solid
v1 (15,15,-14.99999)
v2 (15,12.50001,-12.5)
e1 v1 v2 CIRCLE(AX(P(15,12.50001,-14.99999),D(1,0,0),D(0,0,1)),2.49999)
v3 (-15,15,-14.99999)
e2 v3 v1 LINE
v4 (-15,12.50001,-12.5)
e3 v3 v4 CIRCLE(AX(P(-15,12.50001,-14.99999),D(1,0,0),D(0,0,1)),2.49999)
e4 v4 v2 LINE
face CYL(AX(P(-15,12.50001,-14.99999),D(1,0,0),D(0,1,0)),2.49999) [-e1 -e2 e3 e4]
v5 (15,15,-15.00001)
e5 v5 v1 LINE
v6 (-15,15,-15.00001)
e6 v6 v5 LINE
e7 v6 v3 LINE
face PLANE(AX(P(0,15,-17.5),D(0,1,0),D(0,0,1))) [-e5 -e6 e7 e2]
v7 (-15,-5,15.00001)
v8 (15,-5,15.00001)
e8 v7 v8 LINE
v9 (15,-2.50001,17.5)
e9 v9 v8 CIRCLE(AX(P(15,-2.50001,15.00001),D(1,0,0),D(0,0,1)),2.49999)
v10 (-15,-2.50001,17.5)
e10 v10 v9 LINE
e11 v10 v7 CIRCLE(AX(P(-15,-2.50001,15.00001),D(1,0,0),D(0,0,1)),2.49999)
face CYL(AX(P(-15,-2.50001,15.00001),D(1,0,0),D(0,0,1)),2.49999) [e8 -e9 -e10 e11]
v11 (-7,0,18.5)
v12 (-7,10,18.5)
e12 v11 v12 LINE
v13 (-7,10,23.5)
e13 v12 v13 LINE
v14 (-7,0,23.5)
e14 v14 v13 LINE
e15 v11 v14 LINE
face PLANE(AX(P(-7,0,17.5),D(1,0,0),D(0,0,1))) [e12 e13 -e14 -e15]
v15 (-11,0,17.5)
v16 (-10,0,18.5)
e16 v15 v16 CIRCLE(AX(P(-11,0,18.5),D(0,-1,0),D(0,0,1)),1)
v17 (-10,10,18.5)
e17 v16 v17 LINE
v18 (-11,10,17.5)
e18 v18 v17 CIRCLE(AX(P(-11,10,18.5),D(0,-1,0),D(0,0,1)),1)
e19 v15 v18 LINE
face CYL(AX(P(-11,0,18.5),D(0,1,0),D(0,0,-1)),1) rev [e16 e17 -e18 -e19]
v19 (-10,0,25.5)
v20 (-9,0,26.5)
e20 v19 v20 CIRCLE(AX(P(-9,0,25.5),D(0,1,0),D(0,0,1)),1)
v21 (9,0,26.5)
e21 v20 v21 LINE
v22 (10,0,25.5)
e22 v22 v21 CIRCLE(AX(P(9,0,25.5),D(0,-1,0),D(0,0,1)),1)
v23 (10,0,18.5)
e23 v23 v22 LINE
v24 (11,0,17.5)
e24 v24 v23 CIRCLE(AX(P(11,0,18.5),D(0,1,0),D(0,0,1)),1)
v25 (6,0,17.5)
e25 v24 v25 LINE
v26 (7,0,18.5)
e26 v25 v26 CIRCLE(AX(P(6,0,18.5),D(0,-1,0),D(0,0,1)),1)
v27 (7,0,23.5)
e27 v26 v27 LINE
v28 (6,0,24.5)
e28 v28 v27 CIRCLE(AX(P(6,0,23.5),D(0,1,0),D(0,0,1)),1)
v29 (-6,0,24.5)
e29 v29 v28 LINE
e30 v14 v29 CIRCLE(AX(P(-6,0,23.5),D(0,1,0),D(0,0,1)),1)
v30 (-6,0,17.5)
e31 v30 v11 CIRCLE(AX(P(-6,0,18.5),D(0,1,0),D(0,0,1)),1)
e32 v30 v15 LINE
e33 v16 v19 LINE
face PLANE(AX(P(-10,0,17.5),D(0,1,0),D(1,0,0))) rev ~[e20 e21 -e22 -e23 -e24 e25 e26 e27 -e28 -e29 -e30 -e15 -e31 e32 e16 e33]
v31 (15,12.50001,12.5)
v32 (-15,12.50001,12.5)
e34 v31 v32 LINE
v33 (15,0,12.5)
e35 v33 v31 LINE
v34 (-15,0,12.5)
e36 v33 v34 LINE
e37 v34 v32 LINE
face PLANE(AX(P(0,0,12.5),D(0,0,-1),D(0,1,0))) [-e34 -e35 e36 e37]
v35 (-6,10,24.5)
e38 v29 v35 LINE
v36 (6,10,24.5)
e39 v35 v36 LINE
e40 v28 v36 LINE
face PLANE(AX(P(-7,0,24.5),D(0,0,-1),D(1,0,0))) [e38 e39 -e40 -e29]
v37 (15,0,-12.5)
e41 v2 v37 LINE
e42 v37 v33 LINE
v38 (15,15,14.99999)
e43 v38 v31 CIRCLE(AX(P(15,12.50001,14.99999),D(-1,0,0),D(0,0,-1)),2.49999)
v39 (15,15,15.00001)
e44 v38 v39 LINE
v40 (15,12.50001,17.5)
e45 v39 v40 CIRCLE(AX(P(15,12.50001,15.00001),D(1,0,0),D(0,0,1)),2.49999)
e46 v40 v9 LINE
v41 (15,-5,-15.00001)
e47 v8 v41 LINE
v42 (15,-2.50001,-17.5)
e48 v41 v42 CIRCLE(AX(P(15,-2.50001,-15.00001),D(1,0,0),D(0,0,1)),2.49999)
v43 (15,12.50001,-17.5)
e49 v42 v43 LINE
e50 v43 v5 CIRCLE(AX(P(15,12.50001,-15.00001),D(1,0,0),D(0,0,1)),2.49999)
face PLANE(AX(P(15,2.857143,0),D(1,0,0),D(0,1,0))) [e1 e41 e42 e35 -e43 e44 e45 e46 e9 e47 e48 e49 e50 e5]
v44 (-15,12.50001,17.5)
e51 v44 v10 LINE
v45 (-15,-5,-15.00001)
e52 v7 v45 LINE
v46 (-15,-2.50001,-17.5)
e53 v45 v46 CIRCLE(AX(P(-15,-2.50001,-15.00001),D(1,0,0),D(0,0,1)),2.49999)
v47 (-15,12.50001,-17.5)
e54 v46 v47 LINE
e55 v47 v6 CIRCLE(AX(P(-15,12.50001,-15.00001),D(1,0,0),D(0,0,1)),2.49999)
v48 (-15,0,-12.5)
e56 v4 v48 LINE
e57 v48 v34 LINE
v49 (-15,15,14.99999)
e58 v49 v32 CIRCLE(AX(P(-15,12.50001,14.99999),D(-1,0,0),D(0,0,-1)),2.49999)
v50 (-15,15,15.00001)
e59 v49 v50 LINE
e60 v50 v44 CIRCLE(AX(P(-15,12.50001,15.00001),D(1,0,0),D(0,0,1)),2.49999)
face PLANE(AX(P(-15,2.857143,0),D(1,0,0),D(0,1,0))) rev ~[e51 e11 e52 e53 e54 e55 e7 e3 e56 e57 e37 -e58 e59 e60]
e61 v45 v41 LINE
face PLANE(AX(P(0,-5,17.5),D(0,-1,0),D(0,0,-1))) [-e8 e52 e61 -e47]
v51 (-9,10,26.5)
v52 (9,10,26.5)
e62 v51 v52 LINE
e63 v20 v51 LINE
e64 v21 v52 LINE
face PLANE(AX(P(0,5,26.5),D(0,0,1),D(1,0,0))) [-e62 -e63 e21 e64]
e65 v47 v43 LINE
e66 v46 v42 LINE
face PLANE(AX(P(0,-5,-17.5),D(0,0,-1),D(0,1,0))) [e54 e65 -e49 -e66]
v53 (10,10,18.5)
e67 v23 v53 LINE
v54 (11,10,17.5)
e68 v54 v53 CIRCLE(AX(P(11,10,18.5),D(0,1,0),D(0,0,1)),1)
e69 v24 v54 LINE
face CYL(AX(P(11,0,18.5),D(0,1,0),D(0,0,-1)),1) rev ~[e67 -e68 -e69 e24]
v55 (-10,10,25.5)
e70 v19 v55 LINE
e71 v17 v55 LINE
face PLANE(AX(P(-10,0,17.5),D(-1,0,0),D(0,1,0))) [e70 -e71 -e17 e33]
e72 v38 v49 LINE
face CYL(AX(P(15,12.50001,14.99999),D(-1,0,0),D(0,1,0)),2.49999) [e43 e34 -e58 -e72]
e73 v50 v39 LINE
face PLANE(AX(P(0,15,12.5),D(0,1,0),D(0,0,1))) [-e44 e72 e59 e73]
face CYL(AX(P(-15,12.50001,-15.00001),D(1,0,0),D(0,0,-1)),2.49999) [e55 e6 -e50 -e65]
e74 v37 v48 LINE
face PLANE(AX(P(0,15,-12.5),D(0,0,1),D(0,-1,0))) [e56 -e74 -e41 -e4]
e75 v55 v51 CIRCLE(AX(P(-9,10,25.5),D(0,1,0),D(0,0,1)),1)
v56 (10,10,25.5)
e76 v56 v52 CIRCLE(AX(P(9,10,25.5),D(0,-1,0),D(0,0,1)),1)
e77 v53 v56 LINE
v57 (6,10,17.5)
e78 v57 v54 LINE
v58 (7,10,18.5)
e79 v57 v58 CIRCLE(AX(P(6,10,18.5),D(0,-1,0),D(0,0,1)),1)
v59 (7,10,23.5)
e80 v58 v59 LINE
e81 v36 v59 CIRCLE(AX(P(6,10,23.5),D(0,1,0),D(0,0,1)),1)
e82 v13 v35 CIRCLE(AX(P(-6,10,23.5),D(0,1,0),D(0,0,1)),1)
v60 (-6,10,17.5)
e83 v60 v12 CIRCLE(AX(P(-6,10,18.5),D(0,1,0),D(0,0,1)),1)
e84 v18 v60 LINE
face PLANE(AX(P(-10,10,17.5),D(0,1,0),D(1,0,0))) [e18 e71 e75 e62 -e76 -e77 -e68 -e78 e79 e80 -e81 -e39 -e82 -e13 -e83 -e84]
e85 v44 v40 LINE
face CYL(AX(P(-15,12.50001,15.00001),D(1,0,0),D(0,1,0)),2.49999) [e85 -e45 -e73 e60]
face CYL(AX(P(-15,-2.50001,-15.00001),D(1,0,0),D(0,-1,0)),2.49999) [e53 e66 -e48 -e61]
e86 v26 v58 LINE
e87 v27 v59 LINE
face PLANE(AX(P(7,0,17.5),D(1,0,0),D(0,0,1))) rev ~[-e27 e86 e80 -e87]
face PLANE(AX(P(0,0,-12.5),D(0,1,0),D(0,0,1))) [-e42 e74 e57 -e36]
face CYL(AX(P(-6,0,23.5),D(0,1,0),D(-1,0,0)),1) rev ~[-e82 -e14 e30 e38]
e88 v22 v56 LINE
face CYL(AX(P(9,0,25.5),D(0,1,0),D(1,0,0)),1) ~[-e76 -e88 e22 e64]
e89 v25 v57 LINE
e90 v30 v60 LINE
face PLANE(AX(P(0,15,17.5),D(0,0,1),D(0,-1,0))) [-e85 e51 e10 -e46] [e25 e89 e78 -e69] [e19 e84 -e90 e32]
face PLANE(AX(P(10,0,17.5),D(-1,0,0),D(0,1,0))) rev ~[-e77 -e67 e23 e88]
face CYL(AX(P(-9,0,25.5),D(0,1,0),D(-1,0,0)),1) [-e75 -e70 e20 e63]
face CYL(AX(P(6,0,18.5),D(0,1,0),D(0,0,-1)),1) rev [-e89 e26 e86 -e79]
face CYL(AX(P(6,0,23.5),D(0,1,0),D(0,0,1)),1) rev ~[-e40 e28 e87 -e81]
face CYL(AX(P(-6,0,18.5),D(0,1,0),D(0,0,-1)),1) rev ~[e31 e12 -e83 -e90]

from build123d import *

# Parameters (mm, degrees)
F1_DEPTH = 15
F2_W     = 20
F2_H     = 10
F3_DEPTH = 9
F4_R     = 2.49999
F5_W     = 14
F5_H     = 7
F6_DEPTH = 10
F7_R     = 1


# Not quite as in the source:
# - a fillet or chamfer is up to 0.001 mm smaller than in the source, because OpenCascade refuses the exact size


with BuildPart() as f1:
    # F0 (on Right) → F1 (new body, symmetric)
    with BuildSketch(Plane.YZ):
        Polygon((15, 12.5), (15, 17.5), (-5, 17.5), (-5, -17.5), (15, -17.5), (15, -12.5), (0, -12.5), (0, 12.5), align=None)
    extrude(amount=F1_DEPTH, both=True)

    # F2 (on face) → F3 (join)
    with BuildSketch(Plane.XY.offset(17.5)):
        with Locations((0, 5)):
            Rectangle(F2_W, F2_H)
    extrude(amount=F3_DEPTH)

    # F4 (radius 2.5 in the source; OpenCascade refuses exactly that, so slightly less here)
    f4_edges = [f1.edges().sort_by_distance(p)[0] for p in [
        (0, 15, 12.5),
        (0, 15, -12.5),
        (0, 15, 17.5),
        (0, 15, -17.5),
        (0, -5, 17.5),
        (0, -5, -17.5),
    ]]
    fillet(f4_edges, radius=F4_R)

    # F5 (on face) → F6 (cut, through all)
    with BuildSketch(Plane.XZ):
        with Locations((0, 21)):
            Rectangle(F5_W, F5_H)
    extrude(amount=-F6_DEPTH, mode=Mode.SUBTRACT)

    # F7
    f7_edges = [f1.edges().sort_by_distance(p)[0] for p in [
        (-7, 5, 17.5),
        (-7, 5, 24.5),
        (7, 5, 17.5),
        (7, 5, 24.5),
        (-10, 5, 17.5),
        (-10, 5, 26.5),
        (10, 5, 26.5),
        (10, 5, 17.5),
    ]]
    fillet(f7_edges, radius=F7_R)


solid = f1.part
